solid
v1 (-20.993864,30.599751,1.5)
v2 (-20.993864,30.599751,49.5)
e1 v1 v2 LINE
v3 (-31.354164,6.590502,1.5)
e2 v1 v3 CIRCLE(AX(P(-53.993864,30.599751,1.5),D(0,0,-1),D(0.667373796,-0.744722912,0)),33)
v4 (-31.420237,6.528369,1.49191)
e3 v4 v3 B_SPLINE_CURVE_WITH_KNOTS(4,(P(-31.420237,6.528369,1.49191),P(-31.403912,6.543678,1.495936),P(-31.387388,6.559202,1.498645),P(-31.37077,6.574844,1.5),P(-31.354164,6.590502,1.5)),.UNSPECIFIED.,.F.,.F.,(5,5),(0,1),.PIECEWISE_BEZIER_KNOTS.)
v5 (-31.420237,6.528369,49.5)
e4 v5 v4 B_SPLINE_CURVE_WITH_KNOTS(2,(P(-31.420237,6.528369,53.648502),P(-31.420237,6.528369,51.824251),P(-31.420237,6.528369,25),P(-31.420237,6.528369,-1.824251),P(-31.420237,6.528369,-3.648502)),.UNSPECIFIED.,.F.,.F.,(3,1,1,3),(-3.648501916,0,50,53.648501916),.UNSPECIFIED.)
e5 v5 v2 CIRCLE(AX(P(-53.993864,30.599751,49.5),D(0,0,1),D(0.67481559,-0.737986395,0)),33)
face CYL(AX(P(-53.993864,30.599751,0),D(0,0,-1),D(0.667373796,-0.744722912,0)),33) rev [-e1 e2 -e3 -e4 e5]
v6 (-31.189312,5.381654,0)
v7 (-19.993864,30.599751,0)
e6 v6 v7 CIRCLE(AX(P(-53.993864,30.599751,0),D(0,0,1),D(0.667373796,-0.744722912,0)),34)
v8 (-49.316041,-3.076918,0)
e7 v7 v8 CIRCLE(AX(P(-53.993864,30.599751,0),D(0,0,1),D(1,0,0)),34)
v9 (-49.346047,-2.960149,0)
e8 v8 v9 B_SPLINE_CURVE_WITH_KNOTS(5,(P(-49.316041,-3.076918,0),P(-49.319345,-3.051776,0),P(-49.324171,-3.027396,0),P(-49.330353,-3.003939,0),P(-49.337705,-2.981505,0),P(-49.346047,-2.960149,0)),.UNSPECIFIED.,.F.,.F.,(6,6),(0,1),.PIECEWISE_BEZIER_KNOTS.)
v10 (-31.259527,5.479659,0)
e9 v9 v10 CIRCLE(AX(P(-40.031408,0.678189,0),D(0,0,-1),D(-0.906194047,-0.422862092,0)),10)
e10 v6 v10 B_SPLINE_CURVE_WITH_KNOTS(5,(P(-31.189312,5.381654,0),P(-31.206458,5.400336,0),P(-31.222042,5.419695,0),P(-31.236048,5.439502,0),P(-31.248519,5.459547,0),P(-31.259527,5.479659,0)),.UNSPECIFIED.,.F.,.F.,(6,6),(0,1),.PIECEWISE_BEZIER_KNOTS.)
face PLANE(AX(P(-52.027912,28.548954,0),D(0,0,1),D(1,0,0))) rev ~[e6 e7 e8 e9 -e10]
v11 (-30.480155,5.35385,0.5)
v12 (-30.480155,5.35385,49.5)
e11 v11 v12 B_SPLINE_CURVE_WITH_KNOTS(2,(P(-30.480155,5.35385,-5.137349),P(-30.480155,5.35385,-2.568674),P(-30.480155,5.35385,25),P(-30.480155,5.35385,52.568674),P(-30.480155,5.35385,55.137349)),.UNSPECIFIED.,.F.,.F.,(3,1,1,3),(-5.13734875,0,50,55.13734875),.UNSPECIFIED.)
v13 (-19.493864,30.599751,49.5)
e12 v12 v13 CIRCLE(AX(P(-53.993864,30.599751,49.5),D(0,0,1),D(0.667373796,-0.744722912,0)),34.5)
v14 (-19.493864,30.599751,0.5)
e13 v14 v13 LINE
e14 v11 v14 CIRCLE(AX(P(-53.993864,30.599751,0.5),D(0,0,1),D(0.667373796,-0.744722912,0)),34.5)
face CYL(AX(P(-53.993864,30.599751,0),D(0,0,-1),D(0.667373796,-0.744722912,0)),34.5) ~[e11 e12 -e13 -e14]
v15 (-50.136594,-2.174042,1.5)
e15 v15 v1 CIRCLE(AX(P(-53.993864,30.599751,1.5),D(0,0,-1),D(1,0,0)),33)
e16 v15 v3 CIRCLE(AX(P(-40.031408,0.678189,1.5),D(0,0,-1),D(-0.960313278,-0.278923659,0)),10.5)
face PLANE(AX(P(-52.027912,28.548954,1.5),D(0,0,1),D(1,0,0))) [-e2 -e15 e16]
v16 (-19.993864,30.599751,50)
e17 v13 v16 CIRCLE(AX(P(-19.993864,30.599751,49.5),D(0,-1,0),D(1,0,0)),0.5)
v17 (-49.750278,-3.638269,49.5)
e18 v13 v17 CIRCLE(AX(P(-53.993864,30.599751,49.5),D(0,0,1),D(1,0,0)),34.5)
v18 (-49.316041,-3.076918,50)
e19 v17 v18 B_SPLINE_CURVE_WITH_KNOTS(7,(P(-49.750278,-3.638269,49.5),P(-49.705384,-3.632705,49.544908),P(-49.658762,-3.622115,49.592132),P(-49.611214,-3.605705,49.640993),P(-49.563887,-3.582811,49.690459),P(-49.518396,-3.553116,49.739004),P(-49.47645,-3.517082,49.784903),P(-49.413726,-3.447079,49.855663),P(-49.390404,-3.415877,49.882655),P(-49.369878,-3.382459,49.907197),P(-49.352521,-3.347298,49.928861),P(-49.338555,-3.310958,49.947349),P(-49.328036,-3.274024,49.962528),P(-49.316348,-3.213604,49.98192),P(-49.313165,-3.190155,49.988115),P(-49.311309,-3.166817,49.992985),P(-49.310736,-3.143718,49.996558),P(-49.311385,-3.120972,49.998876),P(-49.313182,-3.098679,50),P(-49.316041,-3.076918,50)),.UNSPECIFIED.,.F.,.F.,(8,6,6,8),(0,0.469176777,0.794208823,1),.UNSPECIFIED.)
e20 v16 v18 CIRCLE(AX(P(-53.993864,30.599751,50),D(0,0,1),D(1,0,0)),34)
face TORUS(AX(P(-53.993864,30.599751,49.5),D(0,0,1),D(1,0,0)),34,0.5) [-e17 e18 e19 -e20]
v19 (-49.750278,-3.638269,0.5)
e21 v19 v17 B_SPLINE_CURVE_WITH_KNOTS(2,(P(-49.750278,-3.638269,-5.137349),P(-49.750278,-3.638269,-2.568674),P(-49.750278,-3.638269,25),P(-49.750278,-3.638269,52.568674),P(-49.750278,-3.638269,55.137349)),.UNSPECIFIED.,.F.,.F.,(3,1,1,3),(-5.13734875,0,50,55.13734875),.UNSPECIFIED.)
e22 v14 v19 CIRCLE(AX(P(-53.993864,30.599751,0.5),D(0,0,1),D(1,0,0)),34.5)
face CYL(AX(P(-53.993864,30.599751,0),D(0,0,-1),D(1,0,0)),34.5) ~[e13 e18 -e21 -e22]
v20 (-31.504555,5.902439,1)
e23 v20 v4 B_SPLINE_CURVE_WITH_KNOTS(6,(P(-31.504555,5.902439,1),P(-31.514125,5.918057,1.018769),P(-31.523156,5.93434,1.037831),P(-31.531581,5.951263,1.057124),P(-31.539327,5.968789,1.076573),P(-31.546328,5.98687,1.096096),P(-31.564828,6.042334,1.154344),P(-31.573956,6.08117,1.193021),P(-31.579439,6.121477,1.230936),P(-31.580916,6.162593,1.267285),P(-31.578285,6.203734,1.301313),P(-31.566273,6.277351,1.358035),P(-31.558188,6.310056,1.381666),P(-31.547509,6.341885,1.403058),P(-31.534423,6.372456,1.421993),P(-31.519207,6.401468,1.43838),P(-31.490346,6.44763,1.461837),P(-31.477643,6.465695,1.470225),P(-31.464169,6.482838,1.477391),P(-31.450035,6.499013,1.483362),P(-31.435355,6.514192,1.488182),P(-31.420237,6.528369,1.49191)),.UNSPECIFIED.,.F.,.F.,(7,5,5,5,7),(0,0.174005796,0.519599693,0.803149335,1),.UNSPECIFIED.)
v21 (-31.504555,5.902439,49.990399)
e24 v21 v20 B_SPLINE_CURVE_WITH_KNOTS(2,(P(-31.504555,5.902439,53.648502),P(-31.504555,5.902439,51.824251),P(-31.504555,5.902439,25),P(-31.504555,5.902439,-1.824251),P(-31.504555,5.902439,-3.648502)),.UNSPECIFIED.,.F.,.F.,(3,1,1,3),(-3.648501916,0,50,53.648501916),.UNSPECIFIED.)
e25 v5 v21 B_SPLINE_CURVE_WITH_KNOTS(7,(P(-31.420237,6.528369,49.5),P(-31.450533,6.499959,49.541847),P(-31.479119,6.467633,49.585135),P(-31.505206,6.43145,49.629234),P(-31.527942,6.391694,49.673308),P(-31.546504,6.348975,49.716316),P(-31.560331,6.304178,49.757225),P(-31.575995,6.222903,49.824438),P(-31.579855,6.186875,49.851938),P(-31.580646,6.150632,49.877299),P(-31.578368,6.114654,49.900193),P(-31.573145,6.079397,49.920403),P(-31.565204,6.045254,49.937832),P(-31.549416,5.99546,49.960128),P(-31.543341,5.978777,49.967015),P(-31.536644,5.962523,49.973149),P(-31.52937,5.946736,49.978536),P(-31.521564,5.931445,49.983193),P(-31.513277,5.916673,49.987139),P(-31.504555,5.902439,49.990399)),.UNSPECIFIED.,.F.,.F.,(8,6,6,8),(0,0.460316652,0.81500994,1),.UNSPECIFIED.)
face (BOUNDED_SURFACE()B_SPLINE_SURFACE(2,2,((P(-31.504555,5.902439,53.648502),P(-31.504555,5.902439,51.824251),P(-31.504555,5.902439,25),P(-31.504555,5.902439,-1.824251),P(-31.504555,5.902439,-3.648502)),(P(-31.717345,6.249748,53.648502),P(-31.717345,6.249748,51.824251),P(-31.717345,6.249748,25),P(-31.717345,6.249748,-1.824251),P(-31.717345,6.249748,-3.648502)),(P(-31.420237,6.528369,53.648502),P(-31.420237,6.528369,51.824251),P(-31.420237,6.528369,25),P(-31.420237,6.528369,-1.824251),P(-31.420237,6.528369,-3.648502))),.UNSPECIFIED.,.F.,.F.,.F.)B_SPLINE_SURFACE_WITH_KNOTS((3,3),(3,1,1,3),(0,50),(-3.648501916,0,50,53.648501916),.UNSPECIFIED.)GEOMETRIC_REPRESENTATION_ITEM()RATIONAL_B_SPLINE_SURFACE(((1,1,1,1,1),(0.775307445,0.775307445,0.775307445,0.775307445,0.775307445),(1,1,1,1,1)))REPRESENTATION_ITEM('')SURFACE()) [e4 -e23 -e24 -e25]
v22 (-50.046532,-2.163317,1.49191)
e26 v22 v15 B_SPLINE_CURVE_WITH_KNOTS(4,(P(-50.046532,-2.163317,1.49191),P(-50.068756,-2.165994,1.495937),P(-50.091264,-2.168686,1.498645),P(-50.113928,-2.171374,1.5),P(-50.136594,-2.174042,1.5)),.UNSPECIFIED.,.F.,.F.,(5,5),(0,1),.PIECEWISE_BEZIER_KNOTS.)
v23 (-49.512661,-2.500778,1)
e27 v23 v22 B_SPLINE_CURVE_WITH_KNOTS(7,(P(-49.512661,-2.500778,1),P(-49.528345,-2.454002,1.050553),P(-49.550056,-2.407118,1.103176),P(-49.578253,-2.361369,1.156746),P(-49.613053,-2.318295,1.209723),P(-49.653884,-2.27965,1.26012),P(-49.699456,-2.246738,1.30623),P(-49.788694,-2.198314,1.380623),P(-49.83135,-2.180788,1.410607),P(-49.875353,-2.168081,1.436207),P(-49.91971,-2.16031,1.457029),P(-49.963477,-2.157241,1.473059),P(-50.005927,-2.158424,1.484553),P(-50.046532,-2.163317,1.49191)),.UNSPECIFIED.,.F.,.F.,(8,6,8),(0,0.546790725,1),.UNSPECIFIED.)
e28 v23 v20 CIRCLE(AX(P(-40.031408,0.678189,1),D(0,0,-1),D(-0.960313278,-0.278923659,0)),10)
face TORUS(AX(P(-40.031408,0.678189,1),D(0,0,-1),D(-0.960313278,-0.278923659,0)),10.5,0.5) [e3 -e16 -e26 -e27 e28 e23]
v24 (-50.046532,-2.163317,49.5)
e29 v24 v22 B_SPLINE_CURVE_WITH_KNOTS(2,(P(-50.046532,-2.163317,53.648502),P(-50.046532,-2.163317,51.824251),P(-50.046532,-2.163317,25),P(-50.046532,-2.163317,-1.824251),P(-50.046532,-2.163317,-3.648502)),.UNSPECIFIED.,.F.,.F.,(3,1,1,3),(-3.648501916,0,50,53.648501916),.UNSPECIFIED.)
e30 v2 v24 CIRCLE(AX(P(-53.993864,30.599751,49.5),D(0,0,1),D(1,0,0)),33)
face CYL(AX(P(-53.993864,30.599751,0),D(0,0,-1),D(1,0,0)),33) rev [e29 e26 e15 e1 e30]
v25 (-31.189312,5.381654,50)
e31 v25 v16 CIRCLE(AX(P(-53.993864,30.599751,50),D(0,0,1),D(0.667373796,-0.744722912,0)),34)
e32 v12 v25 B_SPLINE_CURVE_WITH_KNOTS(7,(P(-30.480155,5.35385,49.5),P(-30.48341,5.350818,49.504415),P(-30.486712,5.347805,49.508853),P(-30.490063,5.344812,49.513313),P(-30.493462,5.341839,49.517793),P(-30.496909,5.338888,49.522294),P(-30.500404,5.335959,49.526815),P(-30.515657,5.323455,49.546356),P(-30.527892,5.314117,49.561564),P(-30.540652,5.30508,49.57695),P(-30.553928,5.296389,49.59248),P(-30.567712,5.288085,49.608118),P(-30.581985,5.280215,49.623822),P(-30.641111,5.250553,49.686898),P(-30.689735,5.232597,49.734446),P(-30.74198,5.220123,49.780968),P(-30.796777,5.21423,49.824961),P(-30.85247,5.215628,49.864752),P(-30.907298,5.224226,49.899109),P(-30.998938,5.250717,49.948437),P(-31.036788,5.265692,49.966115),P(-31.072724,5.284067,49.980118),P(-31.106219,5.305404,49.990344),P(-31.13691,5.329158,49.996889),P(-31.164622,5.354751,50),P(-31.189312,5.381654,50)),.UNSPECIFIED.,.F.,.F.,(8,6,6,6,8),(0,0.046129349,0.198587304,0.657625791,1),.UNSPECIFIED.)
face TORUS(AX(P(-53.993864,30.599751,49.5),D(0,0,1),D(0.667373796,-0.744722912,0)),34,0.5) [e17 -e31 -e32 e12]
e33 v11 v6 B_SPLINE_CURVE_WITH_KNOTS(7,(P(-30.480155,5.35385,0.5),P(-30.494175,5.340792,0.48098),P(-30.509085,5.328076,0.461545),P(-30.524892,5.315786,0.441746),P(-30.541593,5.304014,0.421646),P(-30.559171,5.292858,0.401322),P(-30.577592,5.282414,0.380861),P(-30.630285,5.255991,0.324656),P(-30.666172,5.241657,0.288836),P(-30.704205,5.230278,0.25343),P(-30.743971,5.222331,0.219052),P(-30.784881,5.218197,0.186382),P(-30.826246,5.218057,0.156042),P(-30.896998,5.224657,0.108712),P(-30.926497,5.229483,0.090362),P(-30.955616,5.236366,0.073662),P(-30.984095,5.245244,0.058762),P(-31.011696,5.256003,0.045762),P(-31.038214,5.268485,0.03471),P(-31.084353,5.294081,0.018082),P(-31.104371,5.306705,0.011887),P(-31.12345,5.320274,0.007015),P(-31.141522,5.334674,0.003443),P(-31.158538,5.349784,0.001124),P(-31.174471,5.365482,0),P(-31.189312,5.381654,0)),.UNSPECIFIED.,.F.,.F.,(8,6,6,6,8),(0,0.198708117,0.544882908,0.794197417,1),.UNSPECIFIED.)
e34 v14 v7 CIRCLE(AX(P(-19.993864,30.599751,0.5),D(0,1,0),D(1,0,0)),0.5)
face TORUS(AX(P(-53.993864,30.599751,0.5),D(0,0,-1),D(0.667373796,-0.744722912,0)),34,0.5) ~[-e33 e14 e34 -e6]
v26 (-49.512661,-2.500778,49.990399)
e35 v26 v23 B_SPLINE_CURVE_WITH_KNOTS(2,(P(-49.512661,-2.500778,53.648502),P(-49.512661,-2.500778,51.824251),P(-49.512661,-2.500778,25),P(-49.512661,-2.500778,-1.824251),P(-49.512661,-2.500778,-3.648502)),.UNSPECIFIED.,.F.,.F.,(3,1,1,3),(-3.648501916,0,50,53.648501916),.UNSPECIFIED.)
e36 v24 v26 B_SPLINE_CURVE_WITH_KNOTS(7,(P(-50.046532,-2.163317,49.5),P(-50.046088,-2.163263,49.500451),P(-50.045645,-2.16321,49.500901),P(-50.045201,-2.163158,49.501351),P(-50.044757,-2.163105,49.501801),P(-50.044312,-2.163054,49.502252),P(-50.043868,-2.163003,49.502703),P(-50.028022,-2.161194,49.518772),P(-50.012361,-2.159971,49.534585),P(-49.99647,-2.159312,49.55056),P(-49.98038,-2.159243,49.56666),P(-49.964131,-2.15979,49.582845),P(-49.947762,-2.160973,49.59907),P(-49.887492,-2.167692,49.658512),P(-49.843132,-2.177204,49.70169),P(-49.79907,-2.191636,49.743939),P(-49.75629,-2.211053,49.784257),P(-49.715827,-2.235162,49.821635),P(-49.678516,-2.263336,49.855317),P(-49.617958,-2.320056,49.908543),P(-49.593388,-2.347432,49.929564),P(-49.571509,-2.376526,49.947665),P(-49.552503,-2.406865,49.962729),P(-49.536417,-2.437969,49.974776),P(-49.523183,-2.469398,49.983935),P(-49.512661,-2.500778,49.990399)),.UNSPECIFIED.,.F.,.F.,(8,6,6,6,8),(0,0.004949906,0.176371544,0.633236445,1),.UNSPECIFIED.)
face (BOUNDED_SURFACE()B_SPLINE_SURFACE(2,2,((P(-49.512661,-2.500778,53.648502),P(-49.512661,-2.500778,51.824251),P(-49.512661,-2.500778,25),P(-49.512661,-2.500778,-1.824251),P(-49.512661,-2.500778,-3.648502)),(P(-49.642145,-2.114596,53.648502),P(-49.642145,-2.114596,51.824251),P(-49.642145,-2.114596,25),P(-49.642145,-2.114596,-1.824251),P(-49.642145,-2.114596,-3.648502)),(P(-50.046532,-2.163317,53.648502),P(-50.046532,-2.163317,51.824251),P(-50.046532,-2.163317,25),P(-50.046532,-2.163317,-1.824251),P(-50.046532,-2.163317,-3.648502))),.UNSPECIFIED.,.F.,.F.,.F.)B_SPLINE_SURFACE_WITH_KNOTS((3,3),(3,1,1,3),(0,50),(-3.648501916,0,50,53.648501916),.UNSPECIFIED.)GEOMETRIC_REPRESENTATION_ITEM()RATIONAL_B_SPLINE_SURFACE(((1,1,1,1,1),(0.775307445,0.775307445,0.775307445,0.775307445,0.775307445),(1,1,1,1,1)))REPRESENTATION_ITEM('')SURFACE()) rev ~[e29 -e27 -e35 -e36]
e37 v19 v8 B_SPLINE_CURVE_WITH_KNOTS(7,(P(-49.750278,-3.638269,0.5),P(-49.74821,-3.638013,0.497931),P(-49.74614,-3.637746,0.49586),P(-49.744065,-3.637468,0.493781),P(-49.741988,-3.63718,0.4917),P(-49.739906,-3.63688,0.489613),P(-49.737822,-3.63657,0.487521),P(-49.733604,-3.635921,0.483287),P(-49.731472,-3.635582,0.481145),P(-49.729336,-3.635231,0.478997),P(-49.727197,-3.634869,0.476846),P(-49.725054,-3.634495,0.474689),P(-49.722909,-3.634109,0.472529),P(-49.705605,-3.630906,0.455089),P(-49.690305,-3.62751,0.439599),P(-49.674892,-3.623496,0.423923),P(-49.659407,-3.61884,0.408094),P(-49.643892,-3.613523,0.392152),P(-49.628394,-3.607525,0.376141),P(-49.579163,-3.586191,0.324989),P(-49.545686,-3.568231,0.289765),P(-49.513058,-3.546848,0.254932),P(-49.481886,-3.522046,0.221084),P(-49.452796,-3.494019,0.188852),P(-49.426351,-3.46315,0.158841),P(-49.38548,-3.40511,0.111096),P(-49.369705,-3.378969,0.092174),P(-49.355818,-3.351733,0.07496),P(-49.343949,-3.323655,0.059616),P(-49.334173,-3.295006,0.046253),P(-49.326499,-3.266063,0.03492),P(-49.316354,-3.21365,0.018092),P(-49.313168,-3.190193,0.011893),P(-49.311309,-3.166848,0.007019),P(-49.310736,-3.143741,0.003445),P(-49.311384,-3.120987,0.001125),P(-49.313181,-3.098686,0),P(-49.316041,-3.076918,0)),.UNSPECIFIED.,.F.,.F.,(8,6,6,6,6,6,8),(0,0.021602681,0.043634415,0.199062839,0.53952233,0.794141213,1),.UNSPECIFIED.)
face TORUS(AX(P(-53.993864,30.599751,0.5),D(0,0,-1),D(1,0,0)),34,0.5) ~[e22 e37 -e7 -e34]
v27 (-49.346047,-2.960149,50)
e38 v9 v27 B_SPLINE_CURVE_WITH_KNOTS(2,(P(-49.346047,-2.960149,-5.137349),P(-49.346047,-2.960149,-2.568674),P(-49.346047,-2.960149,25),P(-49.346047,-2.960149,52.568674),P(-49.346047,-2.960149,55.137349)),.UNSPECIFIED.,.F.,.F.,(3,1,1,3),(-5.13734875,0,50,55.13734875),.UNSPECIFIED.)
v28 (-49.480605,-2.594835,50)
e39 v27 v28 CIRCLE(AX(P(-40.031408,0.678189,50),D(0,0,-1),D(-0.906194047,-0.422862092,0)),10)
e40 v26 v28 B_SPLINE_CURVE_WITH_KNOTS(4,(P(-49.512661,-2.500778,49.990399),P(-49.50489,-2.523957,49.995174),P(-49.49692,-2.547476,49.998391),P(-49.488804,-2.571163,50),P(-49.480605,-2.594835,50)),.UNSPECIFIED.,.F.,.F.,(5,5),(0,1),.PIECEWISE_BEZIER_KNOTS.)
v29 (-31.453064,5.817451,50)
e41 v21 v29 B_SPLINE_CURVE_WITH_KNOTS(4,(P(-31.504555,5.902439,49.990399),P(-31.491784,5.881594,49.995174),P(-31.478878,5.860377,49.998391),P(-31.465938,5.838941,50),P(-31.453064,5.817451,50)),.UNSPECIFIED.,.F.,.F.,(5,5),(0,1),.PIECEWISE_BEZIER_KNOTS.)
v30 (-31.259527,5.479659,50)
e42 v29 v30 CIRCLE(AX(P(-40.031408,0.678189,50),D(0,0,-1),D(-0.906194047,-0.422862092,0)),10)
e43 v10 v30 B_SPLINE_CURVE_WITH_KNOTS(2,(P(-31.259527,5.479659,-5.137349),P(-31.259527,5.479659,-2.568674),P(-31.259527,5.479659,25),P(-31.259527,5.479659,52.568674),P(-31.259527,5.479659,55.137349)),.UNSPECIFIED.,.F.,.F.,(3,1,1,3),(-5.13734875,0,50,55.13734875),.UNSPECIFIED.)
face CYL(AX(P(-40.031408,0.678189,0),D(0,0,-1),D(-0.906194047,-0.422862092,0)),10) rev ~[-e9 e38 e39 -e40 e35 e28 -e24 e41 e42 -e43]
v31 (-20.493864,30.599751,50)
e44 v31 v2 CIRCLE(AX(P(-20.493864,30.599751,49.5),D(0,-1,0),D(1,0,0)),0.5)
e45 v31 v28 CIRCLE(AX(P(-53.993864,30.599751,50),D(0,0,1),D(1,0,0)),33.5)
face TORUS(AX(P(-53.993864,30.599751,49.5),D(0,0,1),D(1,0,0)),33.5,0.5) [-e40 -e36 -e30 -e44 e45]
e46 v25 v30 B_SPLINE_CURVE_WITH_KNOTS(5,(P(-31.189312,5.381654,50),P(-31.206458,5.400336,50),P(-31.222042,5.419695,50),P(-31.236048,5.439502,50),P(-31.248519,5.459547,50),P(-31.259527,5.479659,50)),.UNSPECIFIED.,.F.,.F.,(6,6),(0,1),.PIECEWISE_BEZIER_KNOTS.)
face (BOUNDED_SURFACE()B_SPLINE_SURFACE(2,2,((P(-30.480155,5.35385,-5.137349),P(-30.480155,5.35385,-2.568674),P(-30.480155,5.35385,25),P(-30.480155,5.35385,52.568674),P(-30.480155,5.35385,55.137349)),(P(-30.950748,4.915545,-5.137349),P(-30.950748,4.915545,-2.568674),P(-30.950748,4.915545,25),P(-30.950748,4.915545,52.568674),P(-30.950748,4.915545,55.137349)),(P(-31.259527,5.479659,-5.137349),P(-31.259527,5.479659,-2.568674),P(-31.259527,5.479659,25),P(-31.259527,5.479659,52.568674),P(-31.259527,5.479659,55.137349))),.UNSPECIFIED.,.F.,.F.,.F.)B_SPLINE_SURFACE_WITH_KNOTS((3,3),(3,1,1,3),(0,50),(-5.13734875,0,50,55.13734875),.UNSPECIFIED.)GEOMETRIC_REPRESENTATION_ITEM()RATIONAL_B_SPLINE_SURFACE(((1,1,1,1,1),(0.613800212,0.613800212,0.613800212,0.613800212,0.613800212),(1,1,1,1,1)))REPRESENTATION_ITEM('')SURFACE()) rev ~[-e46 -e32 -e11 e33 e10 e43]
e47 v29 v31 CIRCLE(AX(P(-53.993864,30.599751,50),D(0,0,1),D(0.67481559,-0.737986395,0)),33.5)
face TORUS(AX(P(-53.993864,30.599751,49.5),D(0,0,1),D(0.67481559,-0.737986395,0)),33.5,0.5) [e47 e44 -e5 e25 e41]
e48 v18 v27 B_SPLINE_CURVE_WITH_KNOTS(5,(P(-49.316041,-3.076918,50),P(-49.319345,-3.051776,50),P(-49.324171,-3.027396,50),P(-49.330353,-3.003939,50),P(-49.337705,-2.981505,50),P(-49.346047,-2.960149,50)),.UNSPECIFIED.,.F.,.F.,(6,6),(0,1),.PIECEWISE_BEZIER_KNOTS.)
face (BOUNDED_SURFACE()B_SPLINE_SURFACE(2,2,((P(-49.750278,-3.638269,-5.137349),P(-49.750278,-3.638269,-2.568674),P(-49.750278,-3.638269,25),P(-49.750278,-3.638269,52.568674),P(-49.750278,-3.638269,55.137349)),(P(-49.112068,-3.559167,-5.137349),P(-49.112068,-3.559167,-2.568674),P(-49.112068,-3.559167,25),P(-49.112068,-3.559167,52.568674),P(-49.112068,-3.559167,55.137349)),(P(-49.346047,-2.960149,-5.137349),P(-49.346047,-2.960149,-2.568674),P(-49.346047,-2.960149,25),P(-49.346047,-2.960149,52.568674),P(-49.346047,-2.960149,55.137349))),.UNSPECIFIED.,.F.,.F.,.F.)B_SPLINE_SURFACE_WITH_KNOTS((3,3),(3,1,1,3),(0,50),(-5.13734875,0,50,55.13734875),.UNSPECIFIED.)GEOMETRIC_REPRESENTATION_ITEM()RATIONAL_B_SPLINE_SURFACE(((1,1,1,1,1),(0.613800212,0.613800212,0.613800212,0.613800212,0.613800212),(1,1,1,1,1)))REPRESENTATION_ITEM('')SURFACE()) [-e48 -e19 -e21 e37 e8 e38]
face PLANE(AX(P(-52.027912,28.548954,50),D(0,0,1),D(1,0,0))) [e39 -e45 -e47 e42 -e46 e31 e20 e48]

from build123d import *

# Parameters (mm, degrees)
F1_DEPTH = 50
F2_T     = -1.5
F3_R     = 0.5


with BuildPart() as f1:
    # F0 (on Top) → F1 (new body)
    with BuildSketch(Plane.XY):
        with BuildLine():
            ThreePointArc((-30.9694676058, 4.9068101727), (-22.4931361106, 16.5301319793), (-19.493863568, 30.599750654))
            ThreePointArc((-19.493863568, 30.599750654), (-80.0641317689, 53.196013972), (-49.0933485496, -3.5504316669))
            ThreePointArc((-49.0933485496, -3.5504316669), (-44.2600289976, 9.7401297248), (-30.9694676058, 4.9068101727))
        make_face()
    extrude(amount=F1_DEPTH)

    # F2
    f2_openings = [f1.faces().sort_by_distance(p)[0] for p in [
        (-54.609526, 31.919117, 50),
        (-44.260029, 9.74013, 25),
    ]]
    offset(amount=F2_T, openings=f2_openings)

    # F3
    f3_edges = [f1.edges().sort_by_distance(p)[0] for p in [
        (-68.582606, 61.863445, 50),
        (-67.948313, 60.504154, 50),
        (-49.634541, -2.111047, 25.75),
        (-30.969468, 4.90681, 25),
        (-31.724949, 6.2462, 25.75),
        (-44.260029, 9.74013, 1.5),
        (-68.582606, 61.863445, 0),
        (-49.093349, -3.550432, 25),
    ]]
    fillet(f3_edges, radius=F3_R)


solid = f1.part
